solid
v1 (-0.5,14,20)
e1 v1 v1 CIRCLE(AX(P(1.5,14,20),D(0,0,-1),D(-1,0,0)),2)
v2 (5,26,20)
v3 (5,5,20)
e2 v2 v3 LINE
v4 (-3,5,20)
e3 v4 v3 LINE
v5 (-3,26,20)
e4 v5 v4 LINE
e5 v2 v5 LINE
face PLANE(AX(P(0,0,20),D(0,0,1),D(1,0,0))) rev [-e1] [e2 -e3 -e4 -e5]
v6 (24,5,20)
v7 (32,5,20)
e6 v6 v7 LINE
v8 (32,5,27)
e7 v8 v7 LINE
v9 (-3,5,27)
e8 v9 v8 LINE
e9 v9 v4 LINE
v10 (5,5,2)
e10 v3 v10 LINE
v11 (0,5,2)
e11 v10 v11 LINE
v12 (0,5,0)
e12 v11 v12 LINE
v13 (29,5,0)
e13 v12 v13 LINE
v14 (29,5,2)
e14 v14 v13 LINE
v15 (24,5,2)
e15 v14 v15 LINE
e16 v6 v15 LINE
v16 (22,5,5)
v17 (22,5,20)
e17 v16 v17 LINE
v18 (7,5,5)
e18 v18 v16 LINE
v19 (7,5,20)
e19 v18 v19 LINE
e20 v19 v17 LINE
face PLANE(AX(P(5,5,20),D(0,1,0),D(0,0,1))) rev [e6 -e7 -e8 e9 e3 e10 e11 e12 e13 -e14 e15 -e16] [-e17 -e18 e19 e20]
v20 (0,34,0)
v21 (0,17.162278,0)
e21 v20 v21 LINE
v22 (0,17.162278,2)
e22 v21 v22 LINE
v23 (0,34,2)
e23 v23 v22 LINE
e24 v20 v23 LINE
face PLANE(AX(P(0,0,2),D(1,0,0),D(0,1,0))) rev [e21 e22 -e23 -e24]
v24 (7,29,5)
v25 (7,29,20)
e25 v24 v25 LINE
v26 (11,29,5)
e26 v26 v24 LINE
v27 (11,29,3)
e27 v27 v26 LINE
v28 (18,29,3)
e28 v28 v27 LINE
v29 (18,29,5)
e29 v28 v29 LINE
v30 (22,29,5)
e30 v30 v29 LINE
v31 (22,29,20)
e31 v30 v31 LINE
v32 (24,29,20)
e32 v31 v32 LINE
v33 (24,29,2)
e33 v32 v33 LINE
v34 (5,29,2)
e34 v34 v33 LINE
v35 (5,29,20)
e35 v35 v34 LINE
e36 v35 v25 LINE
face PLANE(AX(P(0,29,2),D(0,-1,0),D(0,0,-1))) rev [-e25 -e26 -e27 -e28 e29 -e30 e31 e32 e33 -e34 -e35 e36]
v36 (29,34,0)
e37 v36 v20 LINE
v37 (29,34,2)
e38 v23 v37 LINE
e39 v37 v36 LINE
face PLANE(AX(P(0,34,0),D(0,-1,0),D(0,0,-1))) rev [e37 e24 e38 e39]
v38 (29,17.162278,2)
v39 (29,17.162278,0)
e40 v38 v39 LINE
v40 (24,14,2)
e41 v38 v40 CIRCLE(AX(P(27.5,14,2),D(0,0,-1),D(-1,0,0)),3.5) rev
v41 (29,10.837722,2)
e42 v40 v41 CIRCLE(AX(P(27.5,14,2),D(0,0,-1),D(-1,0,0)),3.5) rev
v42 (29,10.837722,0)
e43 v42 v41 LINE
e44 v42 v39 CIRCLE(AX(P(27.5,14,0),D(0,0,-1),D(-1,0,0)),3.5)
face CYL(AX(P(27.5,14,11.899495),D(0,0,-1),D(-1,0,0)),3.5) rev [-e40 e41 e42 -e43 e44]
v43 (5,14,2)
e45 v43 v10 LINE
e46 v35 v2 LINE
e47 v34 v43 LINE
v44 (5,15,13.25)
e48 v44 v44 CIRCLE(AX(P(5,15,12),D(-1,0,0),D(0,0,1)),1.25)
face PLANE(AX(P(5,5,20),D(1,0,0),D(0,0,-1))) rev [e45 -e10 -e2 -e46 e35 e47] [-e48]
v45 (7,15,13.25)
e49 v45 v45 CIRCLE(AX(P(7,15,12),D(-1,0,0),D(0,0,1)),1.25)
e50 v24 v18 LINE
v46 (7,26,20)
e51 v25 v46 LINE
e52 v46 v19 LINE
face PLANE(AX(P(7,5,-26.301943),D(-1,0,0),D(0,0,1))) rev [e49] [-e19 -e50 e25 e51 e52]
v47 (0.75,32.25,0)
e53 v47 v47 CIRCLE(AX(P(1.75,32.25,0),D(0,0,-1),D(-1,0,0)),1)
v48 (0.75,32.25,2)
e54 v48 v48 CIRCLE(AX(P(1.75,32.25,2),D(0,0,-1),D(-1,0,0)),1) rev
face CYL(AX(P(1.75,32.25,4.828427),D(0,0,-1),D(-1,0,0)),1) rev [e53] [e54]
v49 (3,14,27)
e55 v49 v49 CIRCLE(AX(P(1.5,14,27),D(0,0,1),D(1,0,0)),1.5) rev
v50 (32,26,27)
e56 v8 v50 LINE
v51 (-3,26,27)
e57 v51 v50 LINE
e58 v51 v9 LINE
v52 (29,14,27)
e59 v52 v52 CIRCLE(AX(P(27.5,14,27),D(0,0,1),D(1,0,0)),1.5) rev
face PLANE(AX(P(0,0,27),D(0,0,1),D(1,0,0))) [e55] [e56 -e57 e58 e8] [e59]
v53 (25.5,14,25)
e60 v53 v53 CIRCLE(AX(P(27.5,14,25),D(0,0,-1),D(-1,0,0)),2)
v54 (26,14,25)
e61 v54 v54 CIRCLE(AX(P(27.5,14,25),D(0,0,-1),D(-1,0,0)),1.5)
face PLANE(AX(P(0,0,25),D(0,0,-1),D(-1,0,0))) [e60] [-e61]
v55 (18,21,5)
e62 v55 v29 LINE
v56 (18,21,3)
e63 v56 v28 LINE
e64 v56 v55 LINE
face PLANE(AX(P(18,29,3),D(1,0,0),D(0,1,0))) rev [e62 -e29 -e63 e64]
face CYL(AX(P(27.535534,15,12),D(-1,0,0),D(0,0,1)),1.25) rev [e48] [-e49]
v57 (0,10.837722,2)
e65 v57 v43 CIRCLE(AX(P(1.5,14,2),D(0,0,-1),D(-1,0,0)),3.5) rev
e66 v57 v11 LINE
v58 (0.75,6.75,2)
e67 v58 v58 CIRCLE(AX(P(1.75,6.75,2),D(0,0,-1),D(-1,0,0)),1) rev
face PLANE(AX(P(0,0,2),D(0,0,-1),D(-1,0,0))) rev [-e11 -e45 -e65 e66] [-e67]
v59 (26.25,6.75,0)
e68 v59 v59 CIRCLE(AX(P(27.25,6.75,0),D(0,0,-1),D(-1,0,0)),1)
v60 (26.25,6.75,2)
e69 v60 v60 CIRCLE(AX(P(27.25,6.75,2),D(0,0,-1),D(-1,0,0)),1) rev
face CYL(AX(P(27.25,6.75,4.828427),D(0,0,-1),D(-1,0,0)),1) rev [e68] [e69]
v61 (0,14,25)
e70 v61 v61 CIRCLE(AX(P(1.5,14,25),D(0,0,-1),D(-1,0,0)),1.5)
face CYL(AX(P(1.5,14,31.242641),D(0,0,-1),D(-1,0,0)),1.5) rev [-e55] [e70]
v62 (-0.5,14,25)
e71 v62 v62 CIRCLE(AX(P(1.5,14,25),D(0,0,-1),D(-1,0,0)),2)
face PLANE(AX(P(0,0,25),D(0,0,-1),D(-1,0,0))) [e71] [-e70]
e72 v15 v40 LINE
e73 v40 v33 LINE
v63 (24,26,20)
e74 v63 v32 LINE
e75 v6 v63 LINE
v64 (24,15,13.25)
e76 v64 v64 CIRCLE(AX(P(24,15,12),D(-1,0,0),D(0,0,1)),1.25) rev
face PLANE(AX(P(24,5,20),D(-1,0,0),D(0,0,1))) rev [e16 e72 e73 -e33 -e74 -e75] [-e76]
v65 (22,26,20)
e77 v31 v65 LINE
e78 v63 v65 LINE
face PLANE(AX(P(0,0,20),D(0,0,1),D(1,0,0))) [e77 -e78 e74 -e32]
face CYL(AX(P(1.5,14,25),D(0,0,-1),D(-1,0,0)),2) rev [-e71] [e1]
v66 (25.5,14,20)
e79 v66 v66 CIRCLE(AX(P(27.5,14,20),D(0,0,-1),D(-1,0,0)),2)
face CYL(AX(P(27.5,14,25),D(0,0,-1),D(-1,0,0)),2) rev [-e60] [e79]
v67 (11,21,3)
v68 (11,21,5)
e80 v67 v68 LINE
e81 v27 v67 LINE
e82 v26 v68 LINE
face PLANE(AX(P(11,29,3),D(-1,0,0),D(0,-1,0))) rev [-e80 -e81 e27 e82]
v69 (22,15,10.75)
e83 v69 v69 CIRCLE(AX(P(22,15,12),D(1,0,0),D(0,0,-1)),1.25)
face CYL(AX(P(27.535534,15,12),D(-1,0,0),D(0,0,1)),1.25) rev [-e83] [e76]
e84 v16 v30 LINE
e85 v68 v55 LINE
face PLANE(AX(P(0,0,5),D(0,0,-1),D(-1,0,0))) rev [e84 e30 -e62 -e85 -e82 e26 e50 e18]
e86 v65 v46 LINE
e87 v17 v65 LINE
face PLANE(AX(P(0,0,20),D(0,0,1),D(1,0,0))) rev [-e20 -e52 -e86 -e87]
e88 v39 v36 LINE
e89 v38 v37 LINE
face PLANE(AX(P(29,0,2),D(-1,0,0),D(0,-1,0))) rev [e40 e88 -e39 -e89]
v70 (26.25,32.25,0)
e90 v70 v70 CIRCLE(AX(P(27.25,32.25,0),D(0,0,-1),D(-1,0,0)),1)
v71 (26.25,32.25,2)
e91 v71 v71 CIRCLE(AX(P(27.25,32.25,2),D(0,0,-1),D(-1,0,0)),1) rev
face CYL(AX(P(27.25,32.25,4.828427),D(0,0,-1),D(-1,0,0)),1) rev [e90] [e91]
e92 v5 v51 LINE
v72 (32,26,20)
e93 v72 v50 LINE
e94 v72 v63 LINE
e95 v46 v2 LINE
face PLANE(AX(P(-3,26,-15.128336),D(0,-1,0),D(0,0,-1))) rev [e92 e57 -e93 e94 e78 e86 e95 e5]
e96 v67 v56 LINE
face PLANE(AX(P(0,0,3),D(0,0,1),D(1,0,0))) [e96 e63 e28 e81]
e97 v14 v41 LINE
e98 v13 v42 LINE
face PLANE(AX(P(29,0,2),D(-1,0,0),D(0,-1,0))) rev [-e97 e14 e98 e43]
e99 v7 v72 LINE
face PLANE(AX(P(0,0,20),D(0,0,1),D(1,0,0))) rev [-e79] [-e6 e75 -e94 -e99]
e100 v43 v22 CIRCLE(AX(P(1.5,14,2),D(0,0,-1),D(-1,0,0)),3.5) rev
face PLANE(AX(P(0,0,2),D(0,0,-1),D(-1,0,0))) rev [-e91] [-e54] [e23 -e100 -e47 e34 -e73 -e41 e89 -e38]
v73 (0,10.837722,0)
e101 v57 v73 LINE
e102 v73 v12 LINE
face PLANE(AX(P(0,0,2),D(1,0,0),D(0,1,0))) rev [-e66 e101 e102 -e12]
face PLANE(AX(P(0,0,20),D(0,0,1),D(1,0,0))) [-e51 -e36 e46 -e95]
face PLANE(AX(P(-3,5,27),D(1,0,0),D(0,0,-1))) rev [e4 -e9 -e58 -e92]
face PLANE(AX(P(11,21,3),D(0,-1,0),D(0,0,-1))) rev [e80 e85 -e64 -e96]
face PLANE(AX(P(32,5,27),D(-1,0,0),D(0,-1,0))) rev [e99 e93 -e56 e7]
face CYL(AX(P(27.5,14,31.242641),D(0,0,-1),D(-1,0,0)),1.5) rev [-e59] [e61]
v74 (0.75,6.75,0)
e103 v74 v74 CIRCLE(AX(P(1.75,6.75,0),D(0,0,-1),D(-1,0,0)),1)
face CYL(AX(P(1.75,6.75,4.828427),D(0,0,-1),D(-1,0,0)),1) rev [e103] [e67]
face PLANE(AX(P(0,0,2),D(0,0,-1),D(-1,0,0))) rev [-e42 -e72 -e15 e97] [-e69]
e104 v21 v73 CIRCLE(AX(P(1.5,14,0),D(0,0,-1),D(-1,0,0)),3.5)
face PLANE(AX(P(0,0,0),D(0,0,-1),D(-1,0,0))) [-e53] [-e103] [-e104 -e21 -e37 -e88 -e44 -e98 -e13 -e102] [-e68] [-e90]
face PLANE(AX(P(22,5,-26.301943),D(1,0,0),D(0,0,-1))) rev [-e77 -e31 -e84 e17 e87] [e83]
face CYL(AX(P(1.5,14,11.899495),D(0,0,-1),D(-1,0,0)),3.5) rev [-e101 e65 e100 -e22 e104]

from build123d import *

# Parameters (mm, degrees)
AUFSATZ_LINEAR_AUSTRAGEN1_OUTLINE_W = 29
AUFSATZ_LINEAR_AUSTRAGEN1_OUTLINE_H = 29
AUFSATZ_LINEAR_AUSTRAGEN1_DEPTH     = 2
SKIZZE2_W                           = 19
SKIZZE2_H                           = 24
AUFSATZ_LINEAR_AUSTRAGEN2_DEPTH     = 18
SKIZZE5_W                           = 15
SKIZZE5_H                           = 24
SCHNITT_LINEAR_AUSTRAGEN2_DEPTH     = 15
SCHNITT_LINEAR_AUSTRAGEN3_REACH     = 44.626
SKIZZE4_R                           = 1.25
SKIZZE6_W                           = 35
SKIZZE6_H                           = 24
AUFSATZ_LINEAR_AUSTRAGEN3_DEPTH     = 7
SKIZZE9_R                           = 2
SCHNITT_LINEAR_AUSTRAGEN4_DEPTH     = 5
SKIZZE19_W                          = 17
SKIZZE19_H                          = 5
SCHNITT_LINEAR_AUSTRAGEN15_DEPTH    = 2
SKIZZE20_R                          = 1.5
SCHNITT_LINEAR_AUSTRAGEN16_DEPTH    = 2
SKIZZE21_W                          = 7
SKIZZE21_H                          = 8
SCHNITT_LINEAR_AUSTRAGEN17_DEPTH    = 2
SKIZZE23_W                          = 6.5
SKIZZE23_H                          = 5
SKIZZE23_W_2                        = 5.5
SCHNITT_LINEAR_AUSTRAGEN18_DEPTH    = 2
SKIZZE24_W                          = 29
SKIZZE24_H                          = 2
AUFSATZ_LINEAR_AUSTRAGEN4_DEPTH     = 5
SKIZZE25_R                          = 1
SCHNITT_LINEAR_AUSTRAGEN19_DEPTH    = 2
SKIZZE26_W                          = 35
SKIZZE26_H                          = 3
SCHNITT_LINEAR_AUSTRAGEN20_DEPTH    = 7
SKIZZE27_R                          = 3.5
SCHNITT_LINEAR_AUSTRAGEN21_DEPTH    = 2


# Read off the part's stored shape, not the designer's step: Aufsatz-Linear austragen1
with BuildPart() as part:
    # Aufsatz-Linear austragen1 outline → Aufsatz-Linear austragen1 (new body)
    with BuildSketch(Plane.XY):
        with Locations((14.5, 14.5)):
            Rectangle(AUFSATZ_LINEAR_AUSTRAGEN1_OUTLINE_W, AUFSATZ_LINEAR_AUSTRAGEN1_OUTLINE_H)
    extrude(amount=AUFSATZ_LINEAR_AUSTRAGEN1_DEPTH)

    # Skizze2 → Aufsatz-Linear austragen2 (add)
    with BuildSketch(Plane.XY.offset(2)):
        with Locations((14.5, 17)):
            Rectangle(SKIZZE2_W, SKIZZE2_H)
    extrude(amount=AUFSATZ_LINEAR_AUSTRAGEN2_DEPTH)

    # Skizze5 → Schnitt-Linear austragen2 (cut)
    with BuildSketch(Plane.XY.offset(20)):
        with Locations((14.5, 17)):
            Rectangle(SKIZZE5_W, SKIZZE5_H)
    extrude(amount=-SCHNITT_LINEAR_AUSTRAGEN2_DEPTH, mode=Mode.SUBTRACT)

    # Schnitt-Linear austragen3: up to this face of the body (flat: up to its plane)
    schnitt_linear_austragen3_end = Plane(part.part.faces().sort_by_distance((24, 17, 11))[0])
    # Skizze4 → Schnitt-Linear austragen3 (cut, up to the picked face)
    with BuildSketch(Plane.ZY.offset(-5), mode=Mode.PRIVATE) as schnitt_linear_austragen3_sk1:
        with Locations((12, 15)):
            Circle(SKIZZE4_R)
    schnitt_linear_austragen3_tool1 = split(extrude(schnitt_linear_austragen3_sk1.sketch, amount=-SCHNITT_LINEAR_AUSTRAGEN3_REACH, mode=Mode.PRIVATE), bisect_by=schnitt_linear_austragen3_end, keep=Keep.BOTH, mode=Mode.PRIVATE)
    add(schnitt_linear_austragen3_tool1.solids().sort_by(Axis((5, 15, 12), (1, 0, 0)))[0], mode=Mode.SUBTRACT)

    # Skizze6 → Aufsatz-Linear austragen3 (add)
    with BuildSketch(Plane.XY.offset(20)):
        with Locations((14.5, 17)):
            Rectangle(SKIZZE6_W, SKIZZE6_H)
    extrude(amount=AUFSATZ_LINEAR_AUSTRAGEN3_DEPTH)

    # Skizze9 → Schnitt-Linear austragen4 (cut)
    with BuildSketch(Plane(origin=(0, 0, 20), x_dir=(-1, 0, 0), z_dir=(0, 0, -1))):
        with Locations((-1.5, 14)):
            Circle(SKIZZE9_R)
        with Locations((-27.5, 14)):
            Circle(SKIZZE9_R)
    extrude(amount=-SCHNITT_LINEAR_AUSTRAGEN4_DEPTH, mode=Mode.SUBTRACT)

    # Skizze19 → Schnitt-Linear austragen15 (cut)
    with BuildSketch(Plane(origin=(0, 0, 0), x_dir=(-1, 0, 0), z_dir=(0, 0, -1))):
        with Locations((-14, 2.5)):
            Rectangle(SKIZZE19_W, SKIZZE19_H)
    extrude(amount=-SCHNITT_LINEAR_AUSTRAGEN15_DEPTH, mode=Mode.SUBTRACT)

    # Skizze20 → Schnitt-Linear austragen16 (cut)
    with BuildSketch(Plane(origin=(0, 0, 25), x_dir=(-1, 0, 0), z_dir=(0, 0, -1))):
        with Locations((-27.5, 14)):
            Circle(SKIZZE20_R)
        with Locations((-1.5, 14)):
            Circle(SKIZZE20_R)
    extrude(amount=-SCHNITT_LINEAR_AUSTRAGEN16_DEPTH, mode=Mode.SUBTRACT)

    # Skizze21 → Schnitt-Linear austragen17 (cut)
    with BuildSketch(Plane.XY.offset(5)):
        with Locations((14.5, 25)):
            Rectangle(SKIZZE21_W, SKIZZE21_H)
    extrude(amount=-SCHNITT_LINEAR_AUSTRAGEN17_DEPTH, mode=Mode.SUBTRACT)

    # Skizze23 → Schnitt-Linear austragen18 (cut)
    with BuildSketch(Plane(origin=(0, 0, 0), x_dir=(-1, 0, 0), z_dir=(0, 0, -1))):
        with Locations((-25.75, 2.5)):
            Rectangle(SKIZZE23_W, SKIZZE23_H)
        with Locations((-2.75, 2.5)):
            Rectangle(SKIZZE23_W_2, SKIZZE23_H)
    extrude(amount=-SCHNITT_LINEAR_AUSTRAGEN18_DEPTH, mode=Mode.SUBTRACT)

    # Skizze24 → Aufsatz-Linear austragen4 (add)
    with BuildSketch(Plane(origin=(0, 29, 0), x_dir=(1, 0, 0), z_dir=(0, 1, 0))):
        with Locations((14.5, -1)):
            Rectangle(SKIZZE24_W, SKIZZE24_H)
    extrude(amount=AUFSATZ_LINEAR_AUSTRAGEN4_DEPTH)

    # Skizze25 → Schnitt-Linear austragen19 (cut)
    with BuildSketch(Plane(origin=(0, 0, 0), x_dir=(-1, 0, 0), z_dir=(0, 0, -1))):
        with Locations((-1.75, 32.25)):
            Circle(SKIZZE25_R)
        with Locations((-27.25, 32.25)):
            Circle(SKIZZE25_R)
        with Locations((-27.25, 6.75)):
            Circle(SKIZZE25_R)
        with Locations((-1.75, 6.75)):
            Circle(SKIZZE25_R)
    extrude(amount=-SCHNITT_LINEAR_AUSTRAGEN19_DEPTH, mode=Mode.SUBTRACT)

    # Skizze26 → Schnitt-Linear austragen20 (cut)
    with BuildSketch(Plane.XY.offset(27)):
        with Locations((14.5, 27.5)):
            Rectangle(SKIZZE26_W, SKIZZE26_H)
    extrude(amount=-SCHNITT_LINEAR_AUSTRAGEN20_DEPTH, mode=Mode.SUBTRACT)

    # Skizze27 → Schnitt-Linear austragen21 (cut)
    with BuildSketch(Plane(origin=(0, 0, 0), x_dir=(-1, 0, 0), z_dir=(0, 0, -1))):
        with Locations((-27.5, 14)):
            Circle(SKIZZE27_R)
        with Locations((-1.5, 14)):
            Circle(SKIZZE27_R)
    extrude(amount=-SCHNITT_LINEAR_AUSTRAGEN21_DEPTH, mode=Mode.SUBTRACT)


solid = part.part
